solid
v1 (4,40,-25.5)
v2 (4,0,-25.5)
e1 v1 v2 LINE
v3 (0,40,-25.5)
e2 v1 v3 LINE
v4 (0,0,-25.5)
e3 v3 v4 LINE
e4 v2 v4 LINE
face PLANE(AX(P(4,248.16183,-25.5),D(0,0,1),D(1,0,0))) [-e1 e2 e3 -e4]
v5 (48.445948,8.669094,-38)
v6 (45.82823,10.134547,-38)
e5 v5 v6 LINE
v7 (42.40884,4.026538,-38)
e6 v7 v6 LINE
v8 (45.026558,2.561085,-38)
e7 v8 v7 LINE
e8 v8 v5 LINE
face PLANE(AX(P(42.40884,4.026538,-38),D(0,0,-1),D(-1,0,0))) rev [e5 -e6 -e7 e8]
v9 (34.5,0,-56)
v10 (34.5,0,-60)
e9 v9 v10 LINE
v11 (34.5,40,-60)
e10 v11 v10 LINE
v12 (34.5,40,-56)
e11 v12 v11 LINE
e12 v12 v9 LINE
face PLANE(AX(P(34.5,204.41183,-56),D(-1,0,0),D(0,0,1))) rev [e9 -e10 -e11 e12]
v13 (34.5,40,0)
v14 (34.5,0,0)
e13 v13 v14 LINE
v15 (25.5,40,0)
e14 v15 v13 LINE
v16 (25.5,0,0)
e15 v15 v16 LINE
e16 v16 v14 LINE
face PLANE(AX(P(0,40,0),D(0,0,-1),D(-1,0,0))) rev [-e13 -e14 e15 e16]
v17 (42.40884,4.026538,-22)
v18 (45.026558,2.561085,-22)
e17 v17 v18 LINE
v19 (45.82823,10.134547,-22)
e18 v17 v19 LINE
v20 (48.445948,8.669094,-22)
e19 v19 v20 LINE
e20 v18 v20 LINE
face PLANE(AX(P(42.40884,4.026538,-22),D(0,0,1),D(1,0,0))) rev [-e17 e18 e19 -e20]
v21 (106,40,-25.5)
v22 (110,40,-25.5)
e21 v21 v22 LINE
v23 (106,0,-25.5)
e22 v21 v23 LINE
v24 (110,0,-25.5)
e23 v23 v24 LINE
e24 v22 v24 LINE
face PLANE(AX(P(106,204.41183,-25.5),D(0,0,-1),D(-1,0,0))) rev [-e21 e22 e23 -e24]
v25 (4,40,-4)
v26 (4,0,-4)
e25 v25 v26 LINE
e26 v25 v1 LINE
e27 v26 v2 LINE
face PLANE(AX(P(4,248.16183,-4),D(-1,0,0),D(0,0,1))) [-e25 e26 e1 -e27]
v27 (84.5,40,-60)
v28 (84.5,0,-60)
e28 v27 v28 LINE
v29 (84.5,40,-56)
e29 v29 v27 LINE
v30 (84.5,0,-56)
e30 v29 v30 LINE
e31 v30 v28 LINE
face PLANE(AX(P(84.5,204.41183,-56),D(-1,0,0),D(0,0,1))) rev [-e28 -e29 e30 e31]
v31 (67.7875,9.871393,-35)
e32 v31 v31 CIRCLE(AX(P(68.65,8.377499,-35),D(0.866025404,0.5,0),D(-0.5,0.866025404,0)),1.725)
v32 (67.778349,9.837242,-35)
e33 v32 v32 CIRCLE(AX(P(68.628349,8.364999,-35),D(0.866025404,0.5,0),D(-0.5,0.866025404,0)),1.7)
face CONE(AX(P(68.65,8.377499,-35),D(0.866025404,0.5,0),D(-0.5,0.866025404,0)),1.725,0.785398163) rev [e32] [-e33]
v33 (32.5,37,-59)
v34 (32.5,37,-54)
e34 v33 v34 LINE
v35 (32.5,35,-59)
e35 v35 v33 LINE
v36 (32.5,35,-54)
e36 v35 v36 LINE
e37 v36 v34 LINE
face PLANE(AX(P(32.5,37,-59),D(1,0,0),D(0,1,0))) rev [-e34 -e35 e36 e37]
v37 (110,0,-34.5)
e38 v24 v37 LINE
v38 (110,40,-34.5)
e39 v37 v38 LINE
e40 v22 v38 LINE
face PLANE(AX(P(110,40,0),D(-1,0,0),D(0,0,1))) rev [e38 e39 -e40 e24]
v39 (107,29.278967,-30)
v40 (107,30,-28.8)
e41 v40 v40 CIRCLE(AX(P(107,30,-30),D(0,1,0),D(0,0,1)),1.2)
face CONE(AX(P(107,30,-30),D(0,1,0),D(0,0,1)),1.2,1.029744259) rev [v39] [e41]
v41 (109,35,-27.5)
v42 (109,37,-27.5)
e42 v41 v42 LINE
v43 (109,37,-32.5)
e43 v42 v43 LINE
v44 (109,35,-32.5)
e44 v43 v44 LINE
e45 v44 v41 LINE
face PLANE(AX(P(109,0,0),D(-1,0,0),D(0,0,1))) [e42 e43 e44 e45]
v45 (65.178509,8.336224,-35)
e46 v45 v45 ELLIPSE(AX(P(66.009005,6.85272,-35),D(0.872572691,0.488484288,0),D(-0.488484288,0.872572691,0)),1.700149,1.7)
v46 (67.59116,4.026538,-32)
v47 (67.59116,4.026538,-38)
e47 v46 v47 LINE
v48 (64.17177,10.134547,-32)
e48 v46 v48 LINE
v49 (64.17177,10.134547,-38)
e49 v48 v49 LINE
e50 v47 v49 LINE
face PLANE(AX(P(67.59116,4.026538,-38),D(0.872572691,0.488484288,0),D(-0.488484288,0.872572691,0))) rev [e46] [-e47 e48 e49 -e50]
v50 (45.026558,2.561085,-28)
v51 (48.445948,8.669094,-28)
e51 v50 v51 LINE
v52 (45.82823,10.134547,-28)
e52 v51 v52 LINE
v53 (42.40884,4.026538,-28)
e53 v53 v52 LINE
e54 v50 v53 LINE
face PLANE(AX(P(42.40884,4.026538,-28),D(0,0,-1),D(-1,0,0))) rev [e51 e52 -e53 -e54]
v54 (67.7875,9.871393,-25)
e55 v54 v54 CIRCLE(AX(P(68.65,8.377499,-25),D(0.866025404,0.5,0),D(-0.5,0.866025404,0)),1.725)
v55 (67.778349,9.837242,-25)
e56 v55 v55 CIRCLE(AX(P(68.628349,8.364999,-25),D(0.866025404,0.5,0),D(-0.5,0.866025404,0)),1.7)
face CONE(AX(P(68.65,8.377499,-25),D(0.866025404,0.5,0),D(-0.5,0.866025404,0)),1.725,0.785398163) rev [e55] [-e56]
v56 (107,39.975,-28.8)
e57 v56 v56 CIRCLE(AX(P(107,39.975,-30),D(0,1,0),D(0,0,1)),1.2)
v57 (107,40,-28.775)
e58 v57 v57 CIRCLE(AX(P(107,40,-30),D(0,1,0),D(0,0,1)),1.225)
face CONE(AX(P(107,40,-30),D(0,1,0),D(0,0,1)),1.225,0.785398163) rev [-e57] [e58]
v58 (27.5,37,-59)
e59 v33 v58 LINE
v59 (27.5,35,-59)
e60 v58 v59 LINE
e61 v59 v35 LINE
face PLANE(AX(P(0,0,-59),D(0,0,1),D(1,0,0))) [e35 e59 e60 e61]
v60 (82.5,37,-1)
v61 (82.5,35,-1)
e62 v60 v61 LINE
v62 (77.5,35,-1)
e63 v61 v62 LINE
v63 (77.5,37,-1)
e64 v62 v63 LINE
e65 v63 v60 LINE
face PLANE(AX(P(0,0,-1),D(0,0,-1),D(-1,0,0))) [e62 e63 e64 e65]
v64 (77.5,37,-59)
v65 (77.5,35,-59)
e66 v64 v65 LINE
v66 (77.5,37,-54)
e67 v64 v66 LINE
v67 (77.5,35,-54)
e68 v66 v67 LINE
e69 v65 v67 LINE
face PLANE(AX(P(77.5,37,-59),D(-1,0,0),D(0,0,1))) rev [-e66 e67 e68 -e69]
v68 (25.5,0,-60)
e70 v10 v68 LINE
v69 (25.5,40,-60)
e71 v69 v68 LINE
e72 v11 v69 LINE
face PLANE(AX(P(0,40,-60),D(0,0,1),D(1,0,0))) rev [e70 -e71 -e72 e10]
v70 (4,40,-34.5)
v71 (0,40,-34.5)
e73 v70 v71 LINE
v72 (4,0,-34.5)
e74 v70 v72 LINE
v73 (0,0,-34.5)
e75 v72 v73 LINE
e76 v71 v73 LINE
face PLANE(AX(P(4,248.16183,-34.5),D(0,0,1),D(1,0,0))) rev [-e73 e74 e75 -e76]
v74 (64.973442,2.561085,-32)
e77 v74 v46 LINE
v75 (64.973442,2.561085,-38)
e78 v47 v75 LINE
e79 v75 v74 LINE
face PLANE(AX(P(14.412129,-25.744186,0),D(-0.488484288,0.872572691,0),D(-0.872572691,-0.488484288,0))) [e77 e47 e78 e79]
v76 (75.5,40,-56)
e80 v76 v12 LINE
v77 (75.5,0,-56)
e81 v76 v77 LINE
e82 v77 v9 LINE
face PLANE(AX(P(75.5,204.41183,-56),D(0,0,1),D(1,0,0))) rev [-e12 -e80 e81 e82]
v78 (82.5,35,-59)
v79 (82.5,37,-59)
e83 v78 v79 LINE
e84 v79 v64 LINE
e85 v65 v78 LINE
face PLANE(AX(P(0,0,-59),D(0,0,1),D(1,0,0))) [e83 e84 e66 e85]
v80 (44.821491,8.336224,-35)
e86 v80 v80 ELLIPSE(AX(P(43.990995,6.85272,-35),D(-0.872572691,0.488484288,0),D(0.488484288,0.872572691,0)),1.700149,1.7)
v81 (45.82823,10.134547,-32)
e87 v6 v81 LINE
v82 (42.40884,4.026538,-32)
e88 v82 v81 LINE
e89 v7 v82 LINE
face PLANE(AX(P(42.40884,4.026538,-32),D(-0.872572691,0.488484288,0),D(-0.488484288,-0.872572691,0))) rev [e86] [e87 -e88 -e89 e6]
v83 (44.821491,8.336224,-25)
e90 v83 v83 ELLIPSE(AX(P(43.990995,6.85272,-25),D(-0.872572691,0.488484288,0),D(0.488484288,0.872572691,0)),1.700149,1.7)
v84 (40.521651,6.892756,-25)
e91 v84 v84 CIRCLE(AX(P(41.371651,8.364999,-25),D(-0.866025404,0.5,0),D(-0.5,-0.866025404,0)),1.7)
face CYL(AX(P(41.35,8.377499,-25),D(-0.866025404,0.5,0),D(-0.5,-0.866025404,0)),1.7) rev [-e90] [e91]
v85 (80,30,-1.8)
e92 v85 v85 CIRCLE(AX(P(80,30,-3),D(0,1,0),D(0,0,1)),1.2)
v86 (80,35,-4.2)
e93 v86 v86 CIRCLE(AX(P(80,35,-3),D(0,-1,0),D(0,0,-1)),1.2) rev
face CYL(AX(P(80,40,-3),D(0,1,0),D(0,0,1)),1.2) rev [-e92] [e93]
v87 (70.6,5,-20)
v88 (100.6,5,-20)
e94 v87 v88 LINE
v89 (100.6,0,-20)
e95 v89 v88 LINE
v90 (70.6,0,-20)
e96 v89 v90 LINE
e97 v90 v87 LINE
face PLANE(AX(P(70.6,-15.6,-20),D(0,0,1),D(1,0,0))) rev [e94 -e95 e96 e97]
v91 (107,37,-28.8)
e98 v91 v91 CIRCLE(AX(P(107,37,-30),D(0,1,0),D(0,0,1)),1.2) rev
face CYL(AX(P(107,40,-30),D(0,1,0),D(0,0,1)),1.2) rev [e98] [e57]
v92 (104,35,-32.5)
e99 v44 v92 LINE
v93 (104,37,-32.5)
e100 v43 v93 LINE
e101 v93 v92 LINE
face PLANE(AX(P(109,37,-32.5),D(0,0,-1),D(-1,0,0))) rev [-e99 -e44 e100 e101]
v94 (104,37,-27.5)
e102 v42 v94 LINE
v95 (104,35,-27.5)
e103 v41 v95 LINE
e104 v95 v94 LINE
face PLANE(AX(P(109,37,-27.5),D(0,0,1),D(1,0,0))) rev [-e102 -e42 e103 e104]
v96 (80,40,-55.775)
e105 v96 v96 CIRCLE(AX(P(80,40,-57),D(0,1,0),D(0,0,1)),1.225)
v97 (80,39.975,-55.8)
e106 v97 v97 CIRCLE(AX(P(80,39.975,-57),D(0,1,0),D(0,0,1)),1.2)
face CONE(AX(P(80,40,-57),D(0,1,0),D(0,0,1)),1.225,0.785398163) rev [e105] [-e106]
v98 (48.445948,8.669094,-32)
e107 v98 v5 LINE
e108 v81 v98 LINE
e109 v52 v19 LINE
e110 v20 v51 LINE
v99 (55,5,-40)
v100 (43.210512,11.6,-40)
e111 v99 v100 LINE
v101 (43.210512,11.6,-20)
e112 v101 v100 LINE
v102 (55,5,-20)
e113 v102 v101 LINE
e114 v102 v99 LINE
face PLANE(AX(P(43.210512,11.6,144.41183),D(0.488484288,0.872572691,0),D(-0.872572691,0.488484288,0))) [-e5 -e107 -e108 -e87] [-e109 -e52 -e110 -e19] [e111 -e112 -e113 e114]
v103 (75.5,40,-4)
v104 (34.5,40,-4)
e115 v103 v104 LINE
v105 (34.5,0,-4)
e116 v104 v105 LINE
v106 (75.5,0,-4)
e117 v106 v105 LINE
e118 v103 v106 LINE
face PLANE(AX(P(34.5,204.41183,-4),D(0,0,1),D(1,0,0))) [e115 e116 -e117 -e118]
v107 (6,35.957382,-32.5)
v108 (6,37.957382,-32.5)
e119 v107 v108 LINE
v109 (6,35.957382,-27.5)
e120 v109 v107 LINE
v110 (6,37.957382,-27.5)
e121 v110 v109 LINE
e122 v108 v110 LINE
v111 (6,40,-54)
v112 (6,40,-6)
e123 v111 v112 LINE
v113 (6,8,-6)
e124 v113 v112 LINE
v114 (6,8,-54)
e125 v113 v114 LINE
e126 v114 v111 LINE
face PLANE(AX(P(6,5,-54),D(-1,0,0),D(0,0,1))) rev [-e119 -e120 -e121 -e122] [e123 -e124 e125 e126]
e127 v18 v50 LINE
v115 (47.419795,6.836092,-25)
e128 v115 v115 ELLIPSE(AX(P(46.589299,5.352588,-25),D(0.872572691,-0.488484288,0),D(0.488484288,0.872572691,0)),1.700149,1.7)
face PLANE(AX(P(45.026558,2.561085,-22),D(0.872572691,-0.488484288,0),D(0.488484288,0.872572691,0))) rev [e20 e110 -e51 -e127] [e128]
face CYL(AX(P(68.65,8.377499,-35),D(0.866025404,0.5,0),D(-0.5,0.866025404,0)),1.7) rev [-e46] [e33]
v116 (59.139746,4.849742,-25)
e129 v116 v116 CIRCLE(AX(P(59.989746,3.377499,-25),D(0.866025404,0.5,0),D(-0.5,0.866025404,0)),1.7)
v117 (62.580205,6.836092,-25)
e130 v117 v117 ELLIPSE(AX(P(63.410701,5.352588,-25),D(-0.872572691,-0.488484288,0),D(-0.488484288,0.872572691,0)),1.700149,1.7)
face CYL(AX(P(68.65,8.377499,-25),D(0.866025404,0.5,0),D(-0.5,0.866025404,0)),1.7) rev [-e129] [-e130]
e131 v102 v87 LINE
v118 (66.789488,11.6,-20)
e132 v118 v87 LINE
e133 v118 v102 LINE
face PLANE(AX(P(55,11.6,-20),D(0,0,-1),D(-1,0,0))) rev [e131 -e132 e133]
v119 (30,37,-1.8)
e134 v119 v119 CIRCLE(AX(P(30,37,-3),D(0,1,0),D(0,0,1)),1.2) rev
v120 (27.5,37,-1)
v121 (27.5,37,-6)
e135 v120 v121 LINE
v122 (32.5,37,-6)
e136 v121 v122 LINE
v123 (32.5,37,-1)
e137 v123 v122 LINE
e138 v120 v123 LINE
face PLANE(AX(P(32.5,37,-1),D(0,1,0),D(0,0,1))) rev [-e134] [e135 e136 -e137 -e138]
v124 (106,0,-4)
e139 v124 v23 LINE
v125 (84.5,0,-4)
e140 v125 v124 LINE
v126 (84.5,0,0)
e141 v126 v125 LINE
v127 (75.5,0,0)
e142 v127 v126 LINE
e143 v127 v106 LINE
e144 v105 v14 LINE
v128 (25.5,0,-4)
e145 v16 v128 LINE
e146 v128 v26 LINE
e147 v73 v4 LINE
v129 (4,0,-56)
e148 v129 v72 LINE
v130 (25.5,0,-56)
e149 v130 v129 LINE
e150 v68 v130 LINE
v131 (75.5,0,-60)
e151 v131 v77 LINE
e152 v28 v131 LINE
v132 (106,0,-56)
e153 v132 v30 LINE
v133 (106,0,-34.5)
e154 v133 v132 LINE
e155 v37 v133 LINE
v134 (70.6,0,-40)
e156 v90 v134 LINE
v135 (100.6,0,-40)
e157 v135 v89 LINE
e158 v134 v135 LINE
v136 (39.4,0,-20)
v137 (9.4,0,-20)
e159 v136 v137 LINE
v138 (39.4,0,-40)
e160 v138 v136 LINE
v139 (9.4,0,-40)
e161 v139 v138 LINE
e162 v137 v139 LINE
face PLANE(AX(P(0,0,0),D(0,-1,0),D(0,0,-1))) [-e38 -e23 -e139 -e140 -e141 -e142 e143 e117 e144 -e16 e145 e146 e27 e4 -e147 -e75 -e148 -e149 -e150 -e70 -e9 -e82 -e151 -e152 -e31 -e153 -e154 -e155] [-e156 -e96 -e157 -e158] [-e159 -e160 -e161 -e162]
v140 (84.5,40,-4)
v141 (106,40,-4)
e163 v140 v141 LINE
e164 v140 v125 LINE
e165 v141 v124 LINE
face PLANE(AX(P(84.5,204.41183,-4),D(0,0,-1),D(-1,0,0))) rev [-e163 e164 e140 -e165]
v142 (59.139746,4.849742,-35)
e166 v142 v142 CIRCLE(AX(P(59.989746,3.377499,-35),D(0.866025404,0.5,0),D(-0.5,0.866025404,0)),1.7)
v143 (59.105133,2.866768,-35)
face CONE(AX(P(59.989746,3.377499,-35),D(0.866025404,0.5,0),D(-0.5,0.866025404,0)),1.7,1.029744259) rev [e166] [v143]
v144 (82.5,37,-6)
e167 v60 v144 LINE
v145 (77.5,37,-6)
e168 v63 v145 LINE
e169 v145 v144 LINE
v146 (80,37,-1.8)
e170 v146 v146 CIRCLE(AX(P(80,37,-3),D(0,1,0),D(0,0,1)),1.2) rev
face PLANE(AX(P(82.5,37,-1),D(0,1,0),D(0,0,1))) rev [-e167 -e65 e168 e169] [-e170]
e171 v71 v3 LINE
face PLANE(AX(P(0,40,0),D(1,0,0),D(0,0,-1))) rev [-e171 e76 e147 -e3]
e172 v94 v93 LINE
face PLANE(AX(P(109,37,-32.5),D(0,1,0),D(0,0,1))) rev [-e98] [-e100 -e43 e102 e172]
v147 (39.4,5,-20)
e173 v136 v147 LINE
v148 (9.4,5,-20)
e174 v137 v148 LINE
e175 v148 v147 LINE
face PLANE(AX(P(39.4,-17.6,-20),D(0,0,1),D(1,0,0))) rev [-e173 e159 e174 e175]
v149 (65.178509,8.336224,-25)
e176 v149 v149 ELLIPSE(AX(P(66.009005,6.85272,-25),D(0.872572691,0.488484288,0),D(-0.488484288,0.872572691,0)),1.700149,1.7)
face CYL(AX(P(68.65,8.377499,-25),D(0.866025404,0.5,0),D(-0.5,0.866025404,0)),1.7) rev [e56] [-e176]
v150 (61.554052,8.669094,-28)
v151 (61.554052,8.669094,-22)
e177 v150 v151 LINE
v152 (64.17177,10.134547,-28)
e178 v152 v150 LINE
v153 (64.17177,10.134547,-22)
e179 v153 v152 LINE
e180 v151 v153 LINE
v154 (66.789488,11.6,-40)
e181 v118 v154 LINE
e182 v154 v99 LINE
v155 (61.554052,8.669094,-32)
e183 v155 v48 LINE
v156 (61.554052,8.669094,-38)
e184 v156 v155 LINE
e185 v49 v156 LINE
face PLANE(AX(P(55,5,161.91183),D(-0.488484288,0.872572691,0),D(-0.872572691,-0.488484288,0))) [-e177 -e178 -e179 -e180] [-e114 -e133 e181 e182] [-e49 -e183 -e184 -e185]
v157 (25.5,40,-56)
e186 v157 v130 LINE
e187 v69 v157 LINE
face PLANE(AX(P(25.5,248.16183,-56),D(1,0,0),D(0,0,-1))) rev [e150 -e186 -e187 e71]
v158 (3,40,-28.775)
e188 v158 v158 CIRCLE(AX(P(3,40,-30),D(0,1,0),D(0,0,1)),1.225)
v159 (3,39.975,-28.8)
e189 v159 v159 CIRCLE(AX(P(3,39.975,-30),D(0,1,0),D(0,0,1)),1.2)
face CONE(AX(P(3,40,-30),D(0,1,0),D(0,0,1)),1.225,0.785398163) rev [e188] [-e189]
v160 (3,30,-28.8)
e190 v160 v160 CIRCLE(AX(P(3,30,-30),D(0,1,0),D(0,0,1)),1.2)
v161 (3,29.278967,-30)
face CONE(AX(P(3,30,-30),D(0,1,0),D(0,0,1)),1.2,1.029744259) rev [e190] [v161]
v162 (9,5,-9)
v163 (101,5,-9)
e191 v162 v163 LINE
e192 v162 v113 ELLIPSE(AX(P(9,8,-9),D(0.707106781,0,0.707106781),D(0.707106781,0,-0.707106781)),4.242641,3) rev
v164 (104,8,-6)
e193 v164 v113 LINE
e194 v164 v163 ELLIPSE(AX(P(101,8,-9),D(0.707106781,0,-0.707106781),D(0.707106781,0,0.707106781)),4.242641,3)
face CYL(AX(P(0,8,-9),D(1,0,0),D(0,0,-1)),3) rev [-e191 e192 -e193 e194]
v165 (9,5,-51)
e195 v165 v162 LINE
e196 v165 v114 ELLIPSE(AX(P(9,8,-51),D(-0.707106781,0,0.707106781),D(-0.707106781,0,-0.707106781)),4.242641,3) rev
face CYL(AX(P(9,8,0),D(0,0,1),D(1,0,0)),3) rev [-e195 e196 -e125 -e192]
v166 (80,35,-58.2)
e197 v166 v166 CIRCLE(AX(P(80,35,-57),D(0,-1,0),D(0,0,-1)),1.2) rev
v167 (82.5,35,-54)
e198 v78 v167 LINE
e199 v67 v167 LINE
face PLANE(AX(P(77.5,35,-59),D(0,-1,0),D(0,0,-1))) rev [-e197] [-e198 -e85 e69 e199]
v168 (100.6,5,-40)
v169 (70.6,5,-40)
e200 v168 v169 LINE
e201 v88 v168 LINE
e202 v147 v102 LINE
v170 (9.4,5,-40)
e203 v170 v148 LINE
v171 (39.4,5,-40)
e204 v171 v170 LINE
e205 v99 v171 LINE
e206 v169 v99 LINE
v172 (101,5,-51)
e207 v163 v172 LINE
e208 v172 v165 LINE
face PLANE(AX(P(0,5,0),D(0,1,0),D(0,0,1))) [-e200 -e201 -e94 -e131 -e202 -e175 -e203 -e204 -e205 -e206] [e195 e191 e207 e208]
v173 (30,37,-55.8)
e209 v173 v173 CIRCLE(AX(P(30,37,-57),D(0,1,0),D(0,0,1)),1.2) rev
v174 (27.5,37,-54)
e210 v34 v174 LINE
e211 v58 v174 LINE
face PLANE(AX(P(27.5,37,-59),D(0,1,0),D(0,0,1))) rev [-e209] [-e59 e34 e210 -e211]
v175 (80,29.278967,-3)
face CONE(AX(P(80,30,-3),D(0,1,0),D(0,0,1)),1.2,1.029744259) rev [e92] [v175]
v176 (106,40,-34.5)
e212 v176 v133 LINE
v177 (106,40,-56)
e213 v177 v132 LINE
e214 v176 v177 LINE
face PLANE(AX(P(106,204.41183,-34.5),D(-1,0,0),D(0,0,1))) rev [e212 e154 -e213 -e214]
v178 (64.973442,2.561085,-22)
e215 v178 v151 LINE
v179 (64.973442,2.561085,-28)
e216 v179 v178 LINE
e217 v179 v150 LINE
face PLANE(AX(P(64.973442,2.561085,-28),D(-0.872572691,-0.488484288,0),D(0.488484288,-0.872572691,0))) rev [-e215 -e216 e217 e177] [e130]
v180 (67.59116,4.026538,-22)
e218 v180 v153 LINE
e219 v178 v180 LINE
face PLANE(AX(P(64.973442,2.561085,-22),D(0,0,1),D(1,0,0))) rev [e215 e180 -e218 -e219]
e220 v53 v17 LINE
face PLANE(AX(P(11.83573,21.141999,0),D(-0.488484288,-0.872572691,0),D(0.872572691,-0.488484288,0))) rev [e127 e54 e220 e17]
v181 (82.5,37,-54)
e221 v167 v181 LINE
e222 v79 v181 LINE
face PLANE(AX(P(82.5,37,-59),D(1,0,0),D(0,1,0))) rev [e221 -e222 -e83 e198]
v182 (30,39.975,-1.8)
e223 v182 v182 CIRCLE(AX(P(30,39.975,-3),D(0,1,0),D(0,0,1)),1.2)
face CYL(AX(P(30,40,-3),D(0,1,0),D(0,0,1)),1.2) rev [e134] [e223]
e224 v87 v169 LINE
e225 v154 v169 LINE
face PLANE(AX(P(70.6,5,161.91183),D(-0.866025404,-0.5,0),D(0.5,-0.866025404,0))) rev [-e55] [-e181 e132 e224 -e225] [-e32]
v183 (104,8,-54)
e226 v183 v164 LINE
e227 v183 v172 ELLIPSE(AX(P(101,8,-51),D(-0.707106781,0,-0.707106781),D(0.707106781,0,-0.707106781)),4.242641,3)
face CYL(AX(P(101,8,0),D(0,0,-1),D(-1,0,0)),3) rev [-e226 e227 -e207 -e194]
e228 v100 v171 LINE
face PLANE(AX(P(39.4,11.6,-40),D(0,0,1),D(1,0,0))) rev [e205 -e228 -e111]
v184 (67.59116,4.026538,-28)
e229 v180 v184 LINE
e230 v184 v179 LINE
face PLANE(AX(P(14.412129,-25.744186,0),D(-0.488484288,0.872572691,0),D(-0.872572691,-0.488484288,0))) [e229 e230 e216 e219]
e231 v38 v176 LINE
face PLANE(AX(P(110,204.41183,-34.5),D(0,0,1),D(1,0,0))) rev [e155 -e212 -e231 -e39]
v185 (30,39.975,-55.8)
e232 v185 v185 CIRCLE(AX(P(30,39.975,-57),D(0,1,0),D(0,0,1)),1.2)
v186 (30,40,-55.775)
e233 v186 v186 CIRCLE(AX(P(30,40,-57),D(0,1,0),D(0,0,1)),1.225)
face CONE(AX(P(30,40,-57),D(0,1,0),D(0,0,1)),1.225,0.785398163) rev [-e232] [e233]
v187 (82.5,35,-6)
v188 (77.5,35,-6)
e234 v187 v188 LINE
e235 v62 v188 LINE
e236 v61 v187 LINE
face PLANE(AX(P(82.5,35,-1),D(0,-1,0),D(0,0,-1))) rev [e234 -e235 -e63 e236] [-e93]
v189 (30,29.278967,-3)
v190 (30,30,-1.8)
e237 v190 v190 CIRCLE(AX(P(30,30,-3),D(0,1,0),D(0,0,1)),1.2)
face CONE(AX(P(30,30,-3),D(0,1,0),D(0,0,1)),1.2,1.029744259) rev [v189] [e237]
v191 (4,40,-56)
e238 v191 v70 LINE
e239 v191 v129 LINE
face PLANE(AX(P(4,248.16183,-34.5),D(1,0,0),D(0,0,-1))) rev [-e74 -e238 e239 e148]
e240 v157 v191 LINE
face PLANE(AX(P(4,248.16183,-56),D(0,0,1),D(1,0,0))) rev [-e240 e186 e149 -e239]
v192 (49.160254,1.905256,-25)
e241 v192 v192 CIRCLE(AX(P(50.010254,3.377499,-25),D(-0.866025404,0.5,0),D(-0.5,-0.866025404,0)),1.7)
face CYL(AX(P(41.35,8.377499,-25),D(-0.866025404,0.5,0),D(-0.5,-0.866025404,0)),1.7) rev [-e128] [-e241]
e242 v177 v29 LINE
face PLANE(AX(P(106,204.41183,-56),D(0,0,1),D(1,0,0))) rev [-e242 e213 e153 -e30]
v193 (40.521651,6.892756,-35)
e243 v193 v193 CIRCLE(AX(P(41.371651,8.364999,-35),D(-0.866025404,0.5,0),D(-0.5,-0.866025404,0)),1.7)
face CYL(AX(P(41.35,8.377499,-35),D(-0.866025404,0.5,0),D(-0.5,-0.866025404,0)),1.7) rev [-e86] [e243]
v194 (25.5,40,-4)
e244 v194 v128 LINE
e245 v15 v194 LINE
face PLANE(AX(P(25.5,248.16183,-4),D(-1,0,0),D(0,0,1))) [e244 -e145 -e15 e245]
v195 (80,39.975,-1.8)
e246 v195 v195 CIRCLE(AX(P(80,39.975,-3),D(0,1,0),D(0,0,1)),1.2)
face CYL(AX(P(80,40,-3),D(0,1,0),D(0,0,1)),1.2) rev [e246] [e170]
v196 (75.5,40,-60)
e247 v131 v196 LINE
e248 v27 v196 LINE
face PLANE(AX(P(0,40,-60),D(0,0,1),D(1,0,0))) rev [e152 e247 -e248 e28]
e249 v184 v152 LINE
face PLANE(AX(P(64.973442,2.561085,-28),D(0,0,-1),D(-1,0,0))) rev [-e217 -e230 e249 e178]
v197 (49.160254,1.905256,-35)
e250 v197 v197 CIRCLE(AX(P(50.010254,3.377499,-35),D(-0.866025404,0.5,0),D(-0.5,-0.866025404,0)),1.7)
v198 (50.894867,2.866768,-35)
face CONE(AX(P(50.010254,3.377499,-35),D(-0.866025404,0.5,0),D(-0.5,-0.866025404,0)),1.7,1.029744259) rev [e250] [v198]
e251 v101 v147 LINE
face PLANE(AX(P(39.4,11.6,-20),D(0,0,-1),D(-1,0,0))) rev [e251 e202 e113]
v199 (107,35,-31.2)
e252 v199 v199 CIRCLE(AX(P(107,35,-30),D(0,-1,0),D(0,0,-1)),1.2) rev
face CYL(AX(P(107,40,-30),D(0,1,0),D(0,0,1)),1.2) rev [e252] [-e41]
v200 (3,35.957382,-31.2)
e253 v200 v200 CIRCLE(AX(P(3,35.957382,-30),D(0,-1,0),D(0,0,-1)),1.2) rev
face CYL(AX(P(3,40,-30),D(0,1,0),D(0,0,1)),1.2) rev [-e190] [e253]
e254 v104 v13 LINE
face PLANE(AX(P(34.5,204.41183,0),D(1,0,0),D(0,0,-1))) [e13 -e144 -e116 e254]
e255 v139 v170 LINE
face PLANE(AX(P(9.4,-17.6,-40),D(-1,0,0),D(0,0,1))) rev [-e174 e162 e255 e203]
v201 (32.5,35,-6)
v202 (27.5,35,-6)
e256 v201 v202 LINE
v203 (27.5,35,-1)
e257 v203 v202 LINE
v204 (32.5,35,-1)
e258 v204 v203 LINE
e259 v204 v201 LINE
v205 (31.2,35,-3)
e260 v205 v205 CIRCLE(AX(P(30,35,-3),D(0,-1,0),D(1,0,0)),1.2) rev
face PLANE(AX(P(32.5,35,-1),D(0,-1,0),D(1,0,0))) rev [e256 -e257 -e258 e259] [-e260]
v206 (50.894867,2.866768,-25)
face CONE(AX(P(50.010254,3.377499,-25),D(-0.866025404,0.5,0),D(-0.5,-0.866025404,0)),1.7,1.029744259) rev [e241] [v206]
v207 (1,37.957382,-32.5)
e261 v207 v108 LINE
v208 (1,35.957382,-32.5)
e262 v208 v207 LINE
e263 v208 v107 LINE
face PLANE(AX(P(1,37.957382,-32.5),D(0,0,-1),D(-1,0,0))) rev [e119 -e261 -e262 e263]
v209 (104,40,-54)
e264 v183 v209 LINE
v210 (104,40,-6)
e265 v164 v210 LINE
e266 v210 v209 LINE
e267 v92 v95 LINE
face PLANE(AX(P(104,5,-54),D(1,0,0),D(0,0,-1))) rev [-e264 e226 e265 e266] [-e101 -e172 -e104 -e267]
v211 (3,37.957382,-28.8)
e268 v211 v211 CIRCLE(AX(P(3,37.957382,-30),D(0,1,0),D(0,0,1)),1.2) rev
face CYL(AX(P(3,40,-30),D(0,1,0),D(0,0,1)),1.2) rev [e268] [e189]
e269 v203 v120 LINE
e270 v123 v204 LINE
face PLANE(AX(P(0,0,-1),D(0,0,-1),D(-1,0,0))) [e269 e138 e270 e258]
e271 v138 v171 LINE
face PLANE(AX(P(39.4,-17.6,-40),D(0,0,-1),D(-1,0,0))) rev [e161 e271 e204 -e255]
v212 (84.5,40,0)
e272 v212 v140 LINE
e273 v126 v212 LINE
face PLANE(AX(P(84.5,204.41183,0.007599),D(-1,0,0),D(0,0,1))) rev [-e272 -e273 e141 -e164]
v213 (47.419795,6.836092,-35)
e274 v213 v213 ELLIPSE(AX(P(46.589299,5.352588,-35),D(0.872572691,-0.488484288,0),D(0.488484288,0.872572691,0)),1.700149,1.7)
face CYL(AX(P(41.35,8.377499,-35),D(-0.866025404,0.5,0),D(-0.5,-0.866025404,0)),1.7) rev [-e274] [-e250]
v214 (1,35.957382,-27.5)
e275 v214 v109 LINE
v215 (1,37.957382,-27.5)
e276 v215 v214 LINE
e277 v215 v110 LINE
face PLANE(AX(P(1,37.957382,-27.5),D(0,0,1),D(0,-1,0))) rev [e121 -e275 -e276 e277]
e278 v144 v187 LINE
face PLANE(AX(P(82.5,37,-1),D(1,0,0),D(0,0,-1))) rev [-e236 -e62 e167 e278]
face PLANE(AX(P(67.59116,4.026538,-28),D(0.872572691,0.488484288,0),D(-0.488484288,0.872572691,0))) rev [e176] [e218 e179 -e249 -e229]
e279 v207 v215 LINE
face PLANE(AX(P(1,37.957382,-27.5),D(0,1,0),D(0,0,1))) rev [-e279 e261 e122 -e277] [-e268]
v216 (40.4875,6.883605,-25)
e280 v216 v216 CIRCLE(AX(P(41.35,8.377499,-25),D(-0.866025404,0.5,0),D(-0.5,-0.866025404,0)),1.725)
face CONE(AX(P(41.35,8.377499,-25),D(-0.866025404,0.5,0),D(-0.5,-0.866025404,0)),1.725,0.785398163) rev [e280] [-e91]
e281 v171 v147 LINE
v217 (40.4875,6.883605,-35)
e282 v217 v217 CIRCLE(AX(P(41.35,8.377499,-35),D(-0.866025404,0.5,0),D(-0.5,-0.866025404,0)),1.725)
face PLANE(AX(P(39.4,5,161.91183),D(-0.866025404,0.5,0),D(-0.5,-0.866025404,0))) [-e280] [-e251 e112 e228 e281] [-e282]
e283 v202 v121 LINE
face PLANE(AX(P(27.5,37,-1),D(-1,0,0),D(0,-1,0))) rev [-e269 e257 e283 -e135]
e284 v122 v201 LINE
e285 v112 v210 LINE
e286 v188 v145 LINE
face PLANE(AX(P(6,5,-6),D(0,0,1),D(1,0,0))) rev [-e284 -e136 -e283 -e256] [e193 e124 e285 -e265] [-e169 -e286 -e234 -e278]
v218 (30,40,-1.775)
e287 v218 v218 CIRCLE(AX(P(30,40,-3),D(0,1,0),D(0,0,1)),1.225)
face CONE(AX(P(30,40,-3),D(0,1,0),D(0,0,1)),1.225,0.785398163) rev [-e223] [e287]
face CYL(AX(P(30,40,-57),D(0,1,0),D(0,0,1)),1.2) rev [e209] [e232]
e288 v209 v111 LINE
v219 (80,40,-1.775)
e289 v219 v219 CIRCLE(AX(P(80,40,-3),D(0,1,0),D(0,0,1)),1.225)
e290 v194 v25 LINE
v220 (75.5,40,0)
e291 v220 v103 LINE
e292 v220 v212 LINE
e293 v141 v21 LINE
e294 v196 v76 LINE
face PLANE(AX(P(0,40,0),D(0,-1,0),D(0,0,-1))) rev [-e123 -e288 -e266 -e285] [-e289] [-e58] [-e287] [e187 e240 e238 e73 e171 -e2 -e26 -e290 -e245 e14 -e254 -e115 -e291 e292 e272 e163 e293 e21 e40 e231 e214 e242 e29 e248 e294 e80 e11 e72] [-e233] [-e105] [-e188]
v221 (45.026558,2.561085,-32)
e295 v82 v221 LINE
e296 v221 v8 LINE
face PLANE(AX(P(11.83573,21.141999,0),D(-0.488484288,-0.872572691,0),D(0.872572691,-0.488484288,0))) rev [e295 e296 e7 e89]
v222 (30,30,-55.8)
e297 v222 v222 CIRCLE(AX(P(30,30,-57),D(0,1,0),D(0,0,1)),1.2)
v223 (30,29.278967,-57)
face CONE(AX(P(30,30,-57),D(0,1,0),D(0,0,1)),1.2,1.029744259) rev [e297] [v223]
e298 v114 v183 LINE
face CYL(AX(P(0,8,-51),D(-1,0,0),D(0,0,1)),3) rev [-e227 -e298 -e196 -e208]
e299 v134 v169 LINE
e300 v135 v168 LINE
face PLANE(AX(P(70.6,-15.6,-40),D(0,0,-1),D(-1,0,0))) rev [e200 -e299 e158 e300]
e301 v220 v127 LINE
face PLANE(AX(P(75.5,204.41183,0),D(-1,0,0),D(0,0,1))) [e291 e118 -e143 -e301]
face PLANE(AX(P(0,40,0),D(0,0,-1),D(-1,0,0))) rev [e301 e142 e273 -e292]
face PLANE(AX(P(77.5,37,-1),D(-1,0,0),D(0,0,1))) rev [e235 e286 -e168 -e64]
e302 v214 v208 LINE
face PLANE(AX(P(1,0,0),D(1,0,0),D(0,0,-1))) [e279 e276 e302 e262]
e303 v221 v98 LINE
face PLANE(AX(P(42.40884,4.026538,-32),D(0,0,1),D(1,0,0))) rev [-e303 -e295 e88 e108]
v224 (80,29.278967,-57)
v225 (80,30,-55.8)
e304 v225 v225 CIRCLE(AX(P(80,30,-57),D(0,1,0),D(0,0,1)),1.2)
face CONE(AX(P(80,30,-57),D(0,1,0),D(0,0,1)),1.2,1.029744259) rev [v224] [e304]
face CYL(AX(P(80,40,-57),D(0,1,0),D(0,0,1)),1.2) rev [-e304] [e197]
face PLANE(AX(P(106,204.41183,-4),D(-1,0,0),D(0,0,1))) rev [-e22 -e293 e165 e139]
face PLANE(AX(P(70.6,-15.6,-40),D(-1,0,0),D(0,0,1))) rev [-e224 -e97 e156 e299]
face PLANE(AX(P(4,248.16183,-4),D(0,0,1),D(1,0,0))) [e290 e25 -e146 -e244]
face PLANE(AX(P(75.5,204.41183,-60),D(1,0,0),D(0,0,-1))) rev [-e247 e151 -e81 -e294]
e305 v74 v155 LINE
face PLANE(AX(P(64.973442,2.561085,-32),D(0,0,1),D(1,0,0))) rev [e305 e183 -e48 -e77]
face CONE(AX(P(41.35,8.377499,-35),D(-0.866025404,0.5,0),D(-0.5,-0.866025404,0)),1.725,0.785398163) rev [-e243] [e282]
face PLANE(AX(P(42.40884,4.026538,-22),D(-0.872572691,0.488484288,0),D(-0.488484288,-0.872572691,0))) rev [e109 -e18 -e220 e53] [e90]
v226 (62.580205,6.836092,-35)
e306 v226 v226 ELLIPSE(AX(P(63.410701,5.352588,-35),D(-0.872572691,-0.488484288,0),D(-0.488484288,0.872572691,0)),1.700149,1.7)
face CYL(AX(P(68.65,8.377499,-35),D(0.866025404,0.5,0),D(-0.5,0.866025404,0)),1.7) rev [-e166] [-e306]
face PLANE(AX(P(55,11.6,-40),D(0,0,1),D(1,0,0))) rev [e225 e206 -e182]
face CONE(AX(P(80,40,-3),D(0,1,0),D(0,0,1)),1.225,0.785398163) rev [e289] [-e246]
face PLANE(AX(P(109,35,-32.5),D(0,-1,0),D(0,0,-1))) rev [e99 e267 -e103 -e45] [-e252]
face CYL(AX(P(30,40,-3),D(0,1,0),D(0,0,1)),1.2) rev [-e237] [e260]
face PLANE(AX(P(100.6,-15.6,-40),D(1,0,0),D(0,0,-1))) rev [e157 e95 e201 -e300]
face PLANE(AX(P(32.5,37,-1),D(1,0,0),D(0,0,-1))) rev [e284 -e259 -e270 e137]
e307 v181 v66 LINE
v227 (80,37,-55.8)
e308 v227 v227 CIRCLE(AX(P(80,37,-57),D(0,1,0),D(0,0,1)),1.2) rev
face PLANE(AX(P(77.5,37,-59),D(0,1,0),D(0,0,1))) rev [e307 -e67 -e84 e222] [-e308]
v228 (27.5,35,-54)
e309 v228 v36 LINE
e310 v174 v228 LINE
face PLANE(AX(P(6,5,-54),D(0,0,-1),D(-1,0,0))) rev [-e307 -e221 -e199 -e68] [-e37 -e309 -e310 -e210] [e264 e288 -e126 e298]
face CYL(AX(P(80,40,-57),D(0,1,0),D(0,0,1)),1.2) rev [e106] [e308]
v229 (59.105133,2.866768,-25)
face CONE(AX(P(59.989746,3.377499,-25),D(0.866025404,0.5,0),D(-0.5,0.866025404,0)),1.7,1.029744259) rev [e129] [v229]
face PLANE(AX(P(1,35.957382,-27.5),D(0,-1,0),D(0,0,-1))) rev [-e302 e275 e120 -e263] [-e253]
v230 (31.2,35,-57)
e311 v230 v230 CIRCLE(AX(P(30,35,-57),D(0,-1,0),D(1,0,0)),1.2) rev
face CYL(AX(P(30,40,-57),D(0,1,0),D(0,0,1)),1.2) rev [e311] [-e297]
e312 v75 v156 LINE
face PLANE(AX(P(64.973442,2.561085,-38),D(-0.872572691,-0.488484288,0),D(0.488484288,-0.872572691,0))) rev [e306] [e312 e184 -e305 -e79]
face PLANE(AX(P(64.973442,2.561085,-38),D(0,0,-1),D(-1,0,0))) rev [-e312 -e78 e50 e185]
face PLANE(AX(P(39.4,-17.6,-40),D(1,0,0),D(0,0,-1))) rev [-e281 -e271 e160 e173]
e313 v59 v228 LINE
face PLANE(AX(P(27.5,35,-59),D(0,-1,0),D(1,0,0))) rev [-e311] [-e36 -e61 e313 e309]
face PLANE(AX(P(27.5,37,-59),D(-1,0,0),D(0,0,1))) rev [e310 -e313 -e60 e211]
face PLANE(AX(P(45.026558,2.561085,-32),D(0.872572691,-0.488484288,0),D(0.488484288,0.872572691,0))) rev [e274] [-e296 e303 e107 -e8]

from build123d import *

# Parameters (mm, degrees)
SKIZZE1_W                                  = 110
SKIZZE1_H                                  = 60
AUFSATZ_LINEAR_AUSTRAGEN1_DEPTH            = 40
SKIZZE2_W                                  = 98
SKIZZE2_H                                  = 48
SCHNITT_LINEAR_AUSTRAGEN1_DEPTH            = 35
F_2_4_2_4_DURCHMESSER_BOHRUNG1_D           = 2.4
F_2_4_2_4_DURCHMESSER_BOHRUNG1_DEPTH       = 10
F_2_4_2_4_DURCHMESSER_BOHRUNG1_CSINK_D     = 2.45
F_2_4_2_4_DURCHMESSER_BOHRUNG1_CSINK_ANGLE = 90
F_2_4_2_4_DURCHMESSER_BOHRUNG1_TIP         = 0.721032743
SKIZZE5_W                                  = 5
SKIZZE5_H                                  = 2
SCHNITT_LINEAR_AUSTRAGEN2_DEPTH            = 5
SKIZZE6_W                                  = 5
SKIZZE6_H                                  = 2
SCHNITT_LINEAR_AUSTRAGEN3_DEPTH            = 5
SKIZZE7_W                                  = 5
SKIZZE7_H                                  = 2
SCHNITT_LINEAR_AUSTRAGEN4_DEPTH            = 5
SKIZZE8_W                                  = 5
SKIZZE8_H                                  = 2
SCHNITT_LINEAR_AUSTRAGEN5_DEPTH            = 5
SKIZZE9_W                                  = 15.6
SKIZZE9_H                                  = 20
AUFSATZ_LINEAR_AUSTRAGEN2_DEPTH            = 6.6
SCHNITT_LINEAR_START                       = -20
SCHNITT_LINEAR_AUSTRAGEN11_DEPTH           = 20
SCHNITT_LINEAR_AUSTRAGEN12_DEPTH           = 20
SKIZZE19_W                                 = 30
SKIZZE19_H                                 = 20
SCHNITT_LINEAR_AUSTRAGEN13_DEPTH           = 22.6
SKIZZE20_W                                 = 15.6
SKIZZE20_H                                 = 20
AUFSATZ_LINEAR_AUSTRAGEN4_DEPTH            = 6.6
SCHNITT_LINEAR_AUSTRAGEN14_DEPTH           = 20
SCHNITT_LINEAR_AUSTRAGEN15_DEPTH           = 20
SKIZZE23_W                                 = 30
SKIZZE23_H                                 = 20
SCHNITT_LINEAR_AUSTRAGEN16_DEPTH           = 20.6
SKIZZE24_W                                 = 3
SKIZZE24_H                                 = 6
SCHNITT_LINEAR_AUSTRAGEN17_DEPTH           = 7
SKIZZE25_W                                 = 3
SKIZZE25_H                                 = 6
SCHNITT_LINEAR_AUSTRAGEN18_DEPTH           = 7
F_3_4_3_4_DURCHMESSER_BOHRUNG1_D           = 3.4
F_3_4_3_4_DURCHMESSER_BOHRUNG1_DEPTH       = 10
F_3_4_3_4_DURCHMESSER_BOHRUNG1_CSINK_D     = 3.45
F_3_4_3_4_DURCHMESSER_BOHRUNG1_CSINK_ANGLE = 90
F_3_4_3_4_DURCHMESSER_BOHRUNG1_TIP         = 1.021463052
F_3_4_3_4_DURCHMESSER_BOHRUNG2_D           = 3.4
F_3_4_3_4_DURCHMESSER_BOHRUNG2_DEPTH       = 10
F_3_4_3_4_DURCHMESSER_BOHRUNG2_CSINK_D     = 3.45
F_3_4_3_4_DURCHMESSER_BOHRUNG2_CSINK_ANGLE = 90
F_3_4_3_4_DURCHMESSER_BOHRUNG2_TIP         = 1.021463052
VERRUNDUNG1_R                              = 3
SCHNITT_LINEAR_AUSTRAGEN20_DEPTH           = 132.52946438
SCHNITT_LINEAR_AUSTRAGEN20_DEPTH_BACK      = 132.52946438
SCHNITT_LINEAR_AUSTRAGEN21_DEPTH           = 132.52946438
SCHNITT_LINEAR_AUSTRAGEN21_DEPTH_BACK      = 132.52946438
SCHNITT_LINEAR_AUSTRAGEN22_DEPTH           = 132.52946438
SCHNITT_LINEAR_AUSTRAGEN22_DEPTH_BACK      = 132.52946438
SKIZZE32_W                                 = 41
SKIZZE32_H                                 = 4
SCHNITT_LINEAR_AUSTRAGEN23_DEPTH           = 132.52946438
SCHNITT_LINEAR_AUSTRAGEN23_DEPTH_BACK      = 132.52946438
SCHNITT_LINEAR_AUSTRAGEN24_DEPTH           = 132.52946438
SCHNITT_LINEAR_AUSTRAGEN24_DEPTH_BACK      = 132.52946438
SCHNITT_LINEAR_AUSTRAGEN25_DEPTH           = 132.52946438
SCHNITT_LINEAR_AUSTRAGEN25_DEPTH_BACK      = 132.52946438


# Read off the part's stored shape, not the designer's step: Schnitt-Linear austragen11, Schnitt-Linear austragen12, Schnitt-Linear austragen14, Schnitt-Linear austragen15
with BuildPart() as part:
    # Skizze1 → Aufsatz-Linear austragen1 (new body)
    with BuildSketch(Plane(origin=(0, 0, 0), x_dir=(1, 0, 0), z_dir=(0, 1, 0))):
        with Locations((55, 30)):
            Rectangle(SKIZZE1_W, SKIZZE1_H)
    extrude(amount=AUFSATZ_LINEAR_AUSTRAGEN1_DEPTH)

    # Skizze2 → Schnitt-Linear austragen1 (cut)
    with BuildSketch(Plane(origin=(0, 40, 0), x_dir=(1, 0, 0), z_dir=(0, 1, 0))):
        with Locations((55, 30)):
            Rectangle(SKIZZE2_W, SKIZZE2_H)
    extrude(amount=-SCHNITT_LINEAR_AUSTRAGEN1_DEPTH, mode=Mode.SUBTRACT)

    # Ø2.4 (2.4) Durchmesser Bohrung1
    with Locations(Plane(origin=(0, 40, 0), x_dir=(1, 0, 0), z_dir=(0, 1, 0))):
        with Locations((107, 30), (80, 57), (30, 57), (80, 3), (30, 3), (3, 30), (92.736705005, 121.322283987)):
            CounterSinkHole(F_2_4_2_4_DURCHMESSER_BOHRUNG1_D / 2, F_2_4_2_4_DURCHMESSER_BOHRUNG1_CSINK_D / 2, depth=F_2_4_2_4_DURCHMESSER_BOHRUNG1_DEPTH, counter_sink_angle=F_2_4_2_4_DURCHMESSER_BOHRUNG1_CSINK_ANGLE)
            with Locations((0, 0, -(F_2_4_2_4_DURCHMESSER_BOHRUNG1_DEPTH + F_2_4_2_4_DURCHMESSER_BOHRUNG1_TIP / 2))):  # 118° drill point
                Cone(0, F_2_4_2_4_DURCHMESSER_BOHRUNG1_D / 2, F_2_4_2_4_DURCHMESSER_BOHRUNG1_TIP, mode=Mode.SUBTRACT)

    # Skizze5 → Schnitt-Linear austragen2 (cut)
    with BuildSketch(Plane.XY.offset(-54)):
        with Locations((30, 36)):
            Rectangle(SKIZZE5_W, SKIZZE5_H)
        with Locations((80, 36)):
            Rectangle(SKIZZE5_W, SKIZZE5_H)
    extrude(amount=-SCHNITT_LINEAR_AUSTRAGEN2_DEPTH, mode=Mode.SUBTRACT)

    # Skizze6 → Schnitt-Linear austragen3 (cut)
    with BuildSketch(Plane(origin=(6, 0, 0), x_dir=(0, 0, -1), z_dir=(1, 0, 0))):
        with Locations((30, 36.957381644)):
            Rectangle(SKIZZE6_W, SKIZZE6_H)
    extrude(amount=-SCHNITT_LINEAR_AUSTRAGEN3_DEPTH, mode=Mode.SUBTRACT)

    # Skizze7 → Schnitt-Linear austragen4 (cut)
    with BuildSketch(Plane(origin=(0, 0, -6), x_dir=(-1, 0, 0), z_dir=(0, 0, -1))):
        with Locations((-80, 36)):
            Rectangle(SKIZZE7_W, SKIZZE7_H)
        with Locations((-30, 36)):
            Rectangle(SKIZZE7_W, SKIZZE7_H)
    extrude(amount=-SCHNITT_LINEAR_AUSTRAGEN4_DEPTH, mode=Mode.SUBTRACT)

    # Skizze8 → Schnitt-Linear austragen5 (cut)
    with BuildSketch(Plane.ZY.offset(-104)):
        with Locations((-30, 36)):
            Rectangle(SKIZZE8_W, SKIZZE8_H)
    extrude(amount=-SCHNITT_LINEAR_AUSTRAGEN5_DEPTH, mode=Mode.SUBTRACT)

    # Skizze9 → Aufsatz-Linear austragen2 (add)
    with BuildSketch(Plane(origin=(0, 5, 0), x_dir=(1, 0, 0), z_dir=(0, 1, 0))):
        with Locations((47.2, 30)):
            Rectangle(SKIZZE9_W, SKIZZE9_H)
    extrude(amount=AUFSATZ_LINEAR_AUSTRAGEN2_DEPTH)

    # Schnitt-Linear austragen11 outline → Schnitt-Linear austragen11 (cut)
    with BuildSketch(Plane.XY.offset(-20).offset(SCHNITT_LINEAR_START)):
        Polygon((39.4, 5), (43.210511777, 11.6), (39.4, 11.6), align=None)
    extrude(amount=SCHNITT_LINEAR_AUSTRAGEN11_DEPTH, mode=Mode.SUBTRACT)

    # Schnitt-Linear austragen12 outline → Schnitt-Linear austragen12 (cut)
    with BuildSketch(Plane.XY.offset(-20).offset(SCHNITT_LINEAR_START)):
        Polygon((43.210511777, 11.6), (55, 5), (55, 11.6), align=None)
    extrude(amount=SCHNITT_LINEAR_AUSTRAGEN12_DEPTH, mode=Mode.SUBTRACT)

    # Skizze19 → Schnitt-Linear austragen13 (cut)
    with BuildSketch(Plane(origin=(0, 5, 0), x_dir=(1, 0, 0), z_dir=(0, 1, 0))):
        with Locations((24.4, 30)):
            Rectangle(SKIZZE19_W, SKIZZE19_H)
    extrude(amount=-SCHNITT_LINEAR_AUSTRAGEN13_DEPTH, mode=Mode.SUBTRACT)

    # Skizze20 → Aufsatz-Linear austragen4 (add)
    with BuildSketch(Plane(origin=(0, 5, 0), x_dir=(1, 0, 0), z_dir=(0, 1, 0))):
        with Locations((62.8, 30)):
            Rectangle(SKIZZE20_W, SKIZZE20_H)
    extrude(amount=AUFSATZ_LINEAR_AUSTRAGEN4_DEPTH)

    # Schnitt-Linear austragen14 outline → Schnitt-Linear austragen14 (cut)
    with BuildSketch(Plane.XY.offset(-20).offset(SCHNITT_LINEAR_START)):
        Polygon((70.6, 11.6), (66.789488223, 11.6), (70.6, 5), align=None)
    extrude(amount=SCHNITT_LINEAR_AUSTRAGEN14_DEPTH, mode=Mode.SUBTRACT)

    # Schnitt-Linear austragen15 outline → Schnitt-Linear austragen15 (cut)
    with BuildSketch(Plane.XY.offset(-20).offset(SCHNITT_LINEAR_START)):
        Polygon((55, 5), (66.789488223, 11.6), (55, 11.6), align=None)
    extrude(amount=SCHNITT_LINEAR_AUSTRAGEN15_DEPTH, mode=Mode.SUBTRACT)

    # Skizze23 → Schnitt-Linear austragen16 (cut)
    with BuildSketch(Plane(origin=(0, 5, 0), x_dir=(1, 0, 0), z_dir=(0, 1, 0))):
        with Locations((85.6, 30)):
            Rectangle(SKIZZE23_W, SKIZZE23_H)
    extrude(amount=-SCHNITT_LINEAR_AUSTRAGEN16_DEPTH, mode=Mode.SUBTRACT)

    # Skizze24 → Schnitt-Linear austragen17 (cut)
    with BuildSketch(Plane(origin=(15.255119717, 27.250008219, 0), x_dir=(0.8725726906962074, -0.4884842878242667, 0), z_dir=(0.4884842878242667, 0.8725726906962074, 0))):
        with Locations((36.537894789, 25)):
            Rectangle(SKIZZE24_W, SKIZZE24_H)
        with Locations((36.537894789, 35)):
            Rectangle(SKIZZE24_W, SKIZZE24_H)
    extrude(amount=-SCHNITT_LINEAR_AUSTRAGEN17_DEPTH, mode=Mode.SUBTRACT)

    # Skizze25 → Schnitt-Linear austragen18 (cut)
    with BuildSketch(Plane(origin=(10.992739223, -19.636177214, 0), x_dir=(0.8725726906962058, 0.4884842878242695, 0), z_dir=(-0.48848428782426945, 0.8725726906962057, 0))):
        with Locations((59.445101188, 35)):
            Rectangle(SKIZZE25_W, SKIZZE25_H)
        with Locations((59.445101188, 25)):
            Rectangle(SKIZZE25_W, SKIZZE25_H)
    extrude(amount=-SCHNITT_LINEAR_AUSTRAGEN18_DEPTH, mode=Mode.SUBTRACT)

    # Ø3.4 (3.4) Durchmesser Bohrung1
    with Locations(Plane(origin=(55.115063509, 31.820696754, 0), x_dir=(0, 0, -1), z_dir=(0.866025403784436, 0.5000000000000047, 0))):
        with Locations((35, -27.069872981), (25, -27.069872981)):
            CounterSinkHole(F_3_4_3_4_DURCHMESSER_BOHRUNG1_D / 2, F_3_4_3_4_DURCHMESSER_BOHRUNG1_CSINK_D / 2, depth=F_3_4_3_4_DURCHMESSER_BOHRUNG1_DEPTH, counter_sink_angle=F_3_4_3_4_DURCHMESSER_BOHRUNG1_CSINK_ANGLE)
            with Locations((0, 0, -(F_3_4_3_4_DURCHMESSER_BOHRUNG1_DEPTH + F_3_4_3_4_DURCHMESSER_BOHRUNG1_TIP / 2))):  # 118° drill point
                Cone(0, F_3_4_3_4_DURCHMESSER_BOHRUNG1_D / 2, F_3_4_3_4_DURCHMESSER_BOHRUNG1_TIP, mode=Mode.SUBTRACT)

    # Ø3.4 (3.4) Durchmesser Bohrung2
    with Locations(Plane(origin=(27.384936491, -15.810700455, 0), x_dir=(0, 0, 1), z_dir=(-0.8660254037844397, 0.49999999999999806, 0))):
        with Locations((-35, 27.930127019), (-25, 27.930127019)):
            CounterSinkHole(F_3_4_3_4_DURCHMESSER_BOHRUNG2_D / 2, F_3_4_3_4_DURCHMESSER_BOHRUNG2_CSINK_D / 2, depth=F_3_4_3_4_DURCHMESSER_BOHRUNG2_DEPTH, counter_sink_angle=F_3_4_3_4_DURCHMESSER_BOHRUNG2_CSINK_ANGLE)
            with Locations((0, 0, -(F_3_4_3_4_DURCHMESSER_BOHRUNG2_DEPTH + F_3_4_3_4_DURCHMESSER_BOHRUNG2_TIP / 2))):  # 118° drill point
                Cone(0, F_3_4_3_4_DURCHMESSER_BOHRUNG2_D / 2, F_3_4_3_4_DURCHMESSER_BOHRUNG2_TIP, mode=Mode.SUBTRACT)

    # Verrundung1
    verrundung1_edges = [part.edges().sort_by_distance(p)[0] for p in [
        (6, 5, -30),
        (55, 5, -54),
        (104, 5, -30),
        (55, 5, -6),
    ]]
    fillet(verrundung1_edges, radius=VERRUNDUNG1_R)

    # Skizze30 → Schnitt-Linear austragen20 (cut, two sides: drawn at the far end of the back side and taken through both)
    with BuildSketch(Plane(origin=(0, 40, 0), x_dir=(1, 0, 0), z_dir=(0, 1, 0)).offset(-SCHNITT_LINEAR_AUSTRAGEN20_DEPTH_BACK)):
        Polygon((25.5, 300.566693171), (25.5, 60), (25.5, 56), (4, 56), (4, 34.5), (0, 34.5), (-240.566693171, 34.5), (-580.77937331, 374.712680138), (-314.712680138, 640.77937331), align=None)
    extrude(amount=SCHNITT_LINEAR_AUSTRAGEN20_DEPTH + SCHNITT_LINEAR_AUSTRAGEN20_DEPTH_BACK, mode=Mode.SUBTRACT)

    # Skizze31 → Schnitt-Linear austragen21 (cut, two sides: drawn at the far end of the back side and taken through both)
    with BuildSketch(Plane(origin=(0, 40, 0), x_dir=(1, 0, 0), z_dir=(0, 1, 0)).offset(-SCHNITT_LINEAR_AUSTRAGEN21_DEPTH_BACK)):
        Polygon((25.5, -240.566693171), (25.5, 0), (25.5, 4), (4, 4), (4, 25.5), (0, 25.5), (-240.566693171, 25.5), (-580.77937331, -314.712680138), (-314.712680138, -580.77937331), align=None)
    extrude(amount=SCHNITT_LINEAR_AUSTRAGEN21_DEPTH + SCHNITT_LINEAR_AUSTRAGEN21_DEPTH_BACK, mode=Mode.SUBTRACT)

    # Skizze32 → Schnitt-Linear austragen22 (cut, two sides: drawn at the far end of the back side and taken through both)
    with BuildSketch(Plane(origin=(0, 40, 0), x_dir=(1, 0, 0), z_dir=(0, 1, 0)).offset(-SCHNITT_LINEAR_AUSTRAGEN22_DEPTH_BACK)):
        with Locations((55, 2)):
            Rectangle(SKIZZE32_W, SKIZZE32_H)
    extrude(amount=SCHNITT_LINEAR_AUSTRAGEN22_DEPTH + SCHNITT_LINEAR_AUSTRAGEN22_DEPTH_BACK, mode=Mode.SUBTRACT)

    # Skizze34 → Schnitt-Linear austragen23 (cut, two sides: drawn at the far end of the back side and taken through both)
    with BuildSketch(Plane(origin=(0, 40, 0), x_dir=(1, 0, 0), z_dir=(0, 1, 0)).offset(-SCHNITT_LINEAR_AUSTRAGEN23_DEPTH_BACK)):
        Polygon((84.5, -240.574291843), (84.5, -0.007598672), (84.5, 4), (106, 4), (106, 25.5), (110, 25.5), (350.566693171, 25.5), (690.784231319, -314.707822059), (424.717538148, -580.782113903), align=None)
    extrude(amount=SCHNITT_LINEAR_AUSTRAGEN23_DEPTH + SCHNITT_LINEAR_AUSTRAGEN23_DEPTH_BACK, mode=Mode.SUBTRACT)

    # Skizze35 → Schnitt-Linear austragen24 (cut, two sides: drawn at the far end of the back side and taken through both)
    with BuildSketch(Plane(origin=(0, 40, 0), x_dir=(1, 0, 0), z_dir=(0, 1, 0)).offset(-SCHNITT_LINEAR_AUSTRAGEN24_DEPTH_BACK)):
        Polygon((350.566693171, 34.5), (110, 34.5), (106, 34.5), (106, 56), (84.5, 56), (84.5, 60), (84.5, 300.566693171), (424.712680138, 640.77937331), (690.77937331, 374.712680138), align=None)
    extrude(amount=SCHNITT_LINEAR_AUSTRAGEN24_DEPTH + SCHNITT_LINEAR_AUSTRAGEN24_DEPTH_BACK, mode=Mode.SUBTRACT)

    # Skizze36 → Schnitt-Linear austragen25 (cut, two sides: drawn at the far end of the back side and taken through both)
    with BuildSketch(Plane(origin=(0, 40, 0), x_dir=(1, 0, 0), z_dir=(0, 1, 0)).offset(-SCHNITT_LINEAR_AUSTRAGEN25_DEPTH_BACK)):
        Polygon((75.5, 262.875607582), (75.5, 60), (75.5, 56), (34.5, 56), (34.5, 60), (34.5, 262.875607582), (34.5, 668.626822745), (75.5, 668.626822745), align=None)
    extrude(amount=SCHNITT_LINEAR_AUSTRAGEN25_DEPTH + SCHNITT_LINEAR_AUSTRAGEN25_DEPTH_BACK, mode=Mode.SUBTRACT)


solid = part.part
